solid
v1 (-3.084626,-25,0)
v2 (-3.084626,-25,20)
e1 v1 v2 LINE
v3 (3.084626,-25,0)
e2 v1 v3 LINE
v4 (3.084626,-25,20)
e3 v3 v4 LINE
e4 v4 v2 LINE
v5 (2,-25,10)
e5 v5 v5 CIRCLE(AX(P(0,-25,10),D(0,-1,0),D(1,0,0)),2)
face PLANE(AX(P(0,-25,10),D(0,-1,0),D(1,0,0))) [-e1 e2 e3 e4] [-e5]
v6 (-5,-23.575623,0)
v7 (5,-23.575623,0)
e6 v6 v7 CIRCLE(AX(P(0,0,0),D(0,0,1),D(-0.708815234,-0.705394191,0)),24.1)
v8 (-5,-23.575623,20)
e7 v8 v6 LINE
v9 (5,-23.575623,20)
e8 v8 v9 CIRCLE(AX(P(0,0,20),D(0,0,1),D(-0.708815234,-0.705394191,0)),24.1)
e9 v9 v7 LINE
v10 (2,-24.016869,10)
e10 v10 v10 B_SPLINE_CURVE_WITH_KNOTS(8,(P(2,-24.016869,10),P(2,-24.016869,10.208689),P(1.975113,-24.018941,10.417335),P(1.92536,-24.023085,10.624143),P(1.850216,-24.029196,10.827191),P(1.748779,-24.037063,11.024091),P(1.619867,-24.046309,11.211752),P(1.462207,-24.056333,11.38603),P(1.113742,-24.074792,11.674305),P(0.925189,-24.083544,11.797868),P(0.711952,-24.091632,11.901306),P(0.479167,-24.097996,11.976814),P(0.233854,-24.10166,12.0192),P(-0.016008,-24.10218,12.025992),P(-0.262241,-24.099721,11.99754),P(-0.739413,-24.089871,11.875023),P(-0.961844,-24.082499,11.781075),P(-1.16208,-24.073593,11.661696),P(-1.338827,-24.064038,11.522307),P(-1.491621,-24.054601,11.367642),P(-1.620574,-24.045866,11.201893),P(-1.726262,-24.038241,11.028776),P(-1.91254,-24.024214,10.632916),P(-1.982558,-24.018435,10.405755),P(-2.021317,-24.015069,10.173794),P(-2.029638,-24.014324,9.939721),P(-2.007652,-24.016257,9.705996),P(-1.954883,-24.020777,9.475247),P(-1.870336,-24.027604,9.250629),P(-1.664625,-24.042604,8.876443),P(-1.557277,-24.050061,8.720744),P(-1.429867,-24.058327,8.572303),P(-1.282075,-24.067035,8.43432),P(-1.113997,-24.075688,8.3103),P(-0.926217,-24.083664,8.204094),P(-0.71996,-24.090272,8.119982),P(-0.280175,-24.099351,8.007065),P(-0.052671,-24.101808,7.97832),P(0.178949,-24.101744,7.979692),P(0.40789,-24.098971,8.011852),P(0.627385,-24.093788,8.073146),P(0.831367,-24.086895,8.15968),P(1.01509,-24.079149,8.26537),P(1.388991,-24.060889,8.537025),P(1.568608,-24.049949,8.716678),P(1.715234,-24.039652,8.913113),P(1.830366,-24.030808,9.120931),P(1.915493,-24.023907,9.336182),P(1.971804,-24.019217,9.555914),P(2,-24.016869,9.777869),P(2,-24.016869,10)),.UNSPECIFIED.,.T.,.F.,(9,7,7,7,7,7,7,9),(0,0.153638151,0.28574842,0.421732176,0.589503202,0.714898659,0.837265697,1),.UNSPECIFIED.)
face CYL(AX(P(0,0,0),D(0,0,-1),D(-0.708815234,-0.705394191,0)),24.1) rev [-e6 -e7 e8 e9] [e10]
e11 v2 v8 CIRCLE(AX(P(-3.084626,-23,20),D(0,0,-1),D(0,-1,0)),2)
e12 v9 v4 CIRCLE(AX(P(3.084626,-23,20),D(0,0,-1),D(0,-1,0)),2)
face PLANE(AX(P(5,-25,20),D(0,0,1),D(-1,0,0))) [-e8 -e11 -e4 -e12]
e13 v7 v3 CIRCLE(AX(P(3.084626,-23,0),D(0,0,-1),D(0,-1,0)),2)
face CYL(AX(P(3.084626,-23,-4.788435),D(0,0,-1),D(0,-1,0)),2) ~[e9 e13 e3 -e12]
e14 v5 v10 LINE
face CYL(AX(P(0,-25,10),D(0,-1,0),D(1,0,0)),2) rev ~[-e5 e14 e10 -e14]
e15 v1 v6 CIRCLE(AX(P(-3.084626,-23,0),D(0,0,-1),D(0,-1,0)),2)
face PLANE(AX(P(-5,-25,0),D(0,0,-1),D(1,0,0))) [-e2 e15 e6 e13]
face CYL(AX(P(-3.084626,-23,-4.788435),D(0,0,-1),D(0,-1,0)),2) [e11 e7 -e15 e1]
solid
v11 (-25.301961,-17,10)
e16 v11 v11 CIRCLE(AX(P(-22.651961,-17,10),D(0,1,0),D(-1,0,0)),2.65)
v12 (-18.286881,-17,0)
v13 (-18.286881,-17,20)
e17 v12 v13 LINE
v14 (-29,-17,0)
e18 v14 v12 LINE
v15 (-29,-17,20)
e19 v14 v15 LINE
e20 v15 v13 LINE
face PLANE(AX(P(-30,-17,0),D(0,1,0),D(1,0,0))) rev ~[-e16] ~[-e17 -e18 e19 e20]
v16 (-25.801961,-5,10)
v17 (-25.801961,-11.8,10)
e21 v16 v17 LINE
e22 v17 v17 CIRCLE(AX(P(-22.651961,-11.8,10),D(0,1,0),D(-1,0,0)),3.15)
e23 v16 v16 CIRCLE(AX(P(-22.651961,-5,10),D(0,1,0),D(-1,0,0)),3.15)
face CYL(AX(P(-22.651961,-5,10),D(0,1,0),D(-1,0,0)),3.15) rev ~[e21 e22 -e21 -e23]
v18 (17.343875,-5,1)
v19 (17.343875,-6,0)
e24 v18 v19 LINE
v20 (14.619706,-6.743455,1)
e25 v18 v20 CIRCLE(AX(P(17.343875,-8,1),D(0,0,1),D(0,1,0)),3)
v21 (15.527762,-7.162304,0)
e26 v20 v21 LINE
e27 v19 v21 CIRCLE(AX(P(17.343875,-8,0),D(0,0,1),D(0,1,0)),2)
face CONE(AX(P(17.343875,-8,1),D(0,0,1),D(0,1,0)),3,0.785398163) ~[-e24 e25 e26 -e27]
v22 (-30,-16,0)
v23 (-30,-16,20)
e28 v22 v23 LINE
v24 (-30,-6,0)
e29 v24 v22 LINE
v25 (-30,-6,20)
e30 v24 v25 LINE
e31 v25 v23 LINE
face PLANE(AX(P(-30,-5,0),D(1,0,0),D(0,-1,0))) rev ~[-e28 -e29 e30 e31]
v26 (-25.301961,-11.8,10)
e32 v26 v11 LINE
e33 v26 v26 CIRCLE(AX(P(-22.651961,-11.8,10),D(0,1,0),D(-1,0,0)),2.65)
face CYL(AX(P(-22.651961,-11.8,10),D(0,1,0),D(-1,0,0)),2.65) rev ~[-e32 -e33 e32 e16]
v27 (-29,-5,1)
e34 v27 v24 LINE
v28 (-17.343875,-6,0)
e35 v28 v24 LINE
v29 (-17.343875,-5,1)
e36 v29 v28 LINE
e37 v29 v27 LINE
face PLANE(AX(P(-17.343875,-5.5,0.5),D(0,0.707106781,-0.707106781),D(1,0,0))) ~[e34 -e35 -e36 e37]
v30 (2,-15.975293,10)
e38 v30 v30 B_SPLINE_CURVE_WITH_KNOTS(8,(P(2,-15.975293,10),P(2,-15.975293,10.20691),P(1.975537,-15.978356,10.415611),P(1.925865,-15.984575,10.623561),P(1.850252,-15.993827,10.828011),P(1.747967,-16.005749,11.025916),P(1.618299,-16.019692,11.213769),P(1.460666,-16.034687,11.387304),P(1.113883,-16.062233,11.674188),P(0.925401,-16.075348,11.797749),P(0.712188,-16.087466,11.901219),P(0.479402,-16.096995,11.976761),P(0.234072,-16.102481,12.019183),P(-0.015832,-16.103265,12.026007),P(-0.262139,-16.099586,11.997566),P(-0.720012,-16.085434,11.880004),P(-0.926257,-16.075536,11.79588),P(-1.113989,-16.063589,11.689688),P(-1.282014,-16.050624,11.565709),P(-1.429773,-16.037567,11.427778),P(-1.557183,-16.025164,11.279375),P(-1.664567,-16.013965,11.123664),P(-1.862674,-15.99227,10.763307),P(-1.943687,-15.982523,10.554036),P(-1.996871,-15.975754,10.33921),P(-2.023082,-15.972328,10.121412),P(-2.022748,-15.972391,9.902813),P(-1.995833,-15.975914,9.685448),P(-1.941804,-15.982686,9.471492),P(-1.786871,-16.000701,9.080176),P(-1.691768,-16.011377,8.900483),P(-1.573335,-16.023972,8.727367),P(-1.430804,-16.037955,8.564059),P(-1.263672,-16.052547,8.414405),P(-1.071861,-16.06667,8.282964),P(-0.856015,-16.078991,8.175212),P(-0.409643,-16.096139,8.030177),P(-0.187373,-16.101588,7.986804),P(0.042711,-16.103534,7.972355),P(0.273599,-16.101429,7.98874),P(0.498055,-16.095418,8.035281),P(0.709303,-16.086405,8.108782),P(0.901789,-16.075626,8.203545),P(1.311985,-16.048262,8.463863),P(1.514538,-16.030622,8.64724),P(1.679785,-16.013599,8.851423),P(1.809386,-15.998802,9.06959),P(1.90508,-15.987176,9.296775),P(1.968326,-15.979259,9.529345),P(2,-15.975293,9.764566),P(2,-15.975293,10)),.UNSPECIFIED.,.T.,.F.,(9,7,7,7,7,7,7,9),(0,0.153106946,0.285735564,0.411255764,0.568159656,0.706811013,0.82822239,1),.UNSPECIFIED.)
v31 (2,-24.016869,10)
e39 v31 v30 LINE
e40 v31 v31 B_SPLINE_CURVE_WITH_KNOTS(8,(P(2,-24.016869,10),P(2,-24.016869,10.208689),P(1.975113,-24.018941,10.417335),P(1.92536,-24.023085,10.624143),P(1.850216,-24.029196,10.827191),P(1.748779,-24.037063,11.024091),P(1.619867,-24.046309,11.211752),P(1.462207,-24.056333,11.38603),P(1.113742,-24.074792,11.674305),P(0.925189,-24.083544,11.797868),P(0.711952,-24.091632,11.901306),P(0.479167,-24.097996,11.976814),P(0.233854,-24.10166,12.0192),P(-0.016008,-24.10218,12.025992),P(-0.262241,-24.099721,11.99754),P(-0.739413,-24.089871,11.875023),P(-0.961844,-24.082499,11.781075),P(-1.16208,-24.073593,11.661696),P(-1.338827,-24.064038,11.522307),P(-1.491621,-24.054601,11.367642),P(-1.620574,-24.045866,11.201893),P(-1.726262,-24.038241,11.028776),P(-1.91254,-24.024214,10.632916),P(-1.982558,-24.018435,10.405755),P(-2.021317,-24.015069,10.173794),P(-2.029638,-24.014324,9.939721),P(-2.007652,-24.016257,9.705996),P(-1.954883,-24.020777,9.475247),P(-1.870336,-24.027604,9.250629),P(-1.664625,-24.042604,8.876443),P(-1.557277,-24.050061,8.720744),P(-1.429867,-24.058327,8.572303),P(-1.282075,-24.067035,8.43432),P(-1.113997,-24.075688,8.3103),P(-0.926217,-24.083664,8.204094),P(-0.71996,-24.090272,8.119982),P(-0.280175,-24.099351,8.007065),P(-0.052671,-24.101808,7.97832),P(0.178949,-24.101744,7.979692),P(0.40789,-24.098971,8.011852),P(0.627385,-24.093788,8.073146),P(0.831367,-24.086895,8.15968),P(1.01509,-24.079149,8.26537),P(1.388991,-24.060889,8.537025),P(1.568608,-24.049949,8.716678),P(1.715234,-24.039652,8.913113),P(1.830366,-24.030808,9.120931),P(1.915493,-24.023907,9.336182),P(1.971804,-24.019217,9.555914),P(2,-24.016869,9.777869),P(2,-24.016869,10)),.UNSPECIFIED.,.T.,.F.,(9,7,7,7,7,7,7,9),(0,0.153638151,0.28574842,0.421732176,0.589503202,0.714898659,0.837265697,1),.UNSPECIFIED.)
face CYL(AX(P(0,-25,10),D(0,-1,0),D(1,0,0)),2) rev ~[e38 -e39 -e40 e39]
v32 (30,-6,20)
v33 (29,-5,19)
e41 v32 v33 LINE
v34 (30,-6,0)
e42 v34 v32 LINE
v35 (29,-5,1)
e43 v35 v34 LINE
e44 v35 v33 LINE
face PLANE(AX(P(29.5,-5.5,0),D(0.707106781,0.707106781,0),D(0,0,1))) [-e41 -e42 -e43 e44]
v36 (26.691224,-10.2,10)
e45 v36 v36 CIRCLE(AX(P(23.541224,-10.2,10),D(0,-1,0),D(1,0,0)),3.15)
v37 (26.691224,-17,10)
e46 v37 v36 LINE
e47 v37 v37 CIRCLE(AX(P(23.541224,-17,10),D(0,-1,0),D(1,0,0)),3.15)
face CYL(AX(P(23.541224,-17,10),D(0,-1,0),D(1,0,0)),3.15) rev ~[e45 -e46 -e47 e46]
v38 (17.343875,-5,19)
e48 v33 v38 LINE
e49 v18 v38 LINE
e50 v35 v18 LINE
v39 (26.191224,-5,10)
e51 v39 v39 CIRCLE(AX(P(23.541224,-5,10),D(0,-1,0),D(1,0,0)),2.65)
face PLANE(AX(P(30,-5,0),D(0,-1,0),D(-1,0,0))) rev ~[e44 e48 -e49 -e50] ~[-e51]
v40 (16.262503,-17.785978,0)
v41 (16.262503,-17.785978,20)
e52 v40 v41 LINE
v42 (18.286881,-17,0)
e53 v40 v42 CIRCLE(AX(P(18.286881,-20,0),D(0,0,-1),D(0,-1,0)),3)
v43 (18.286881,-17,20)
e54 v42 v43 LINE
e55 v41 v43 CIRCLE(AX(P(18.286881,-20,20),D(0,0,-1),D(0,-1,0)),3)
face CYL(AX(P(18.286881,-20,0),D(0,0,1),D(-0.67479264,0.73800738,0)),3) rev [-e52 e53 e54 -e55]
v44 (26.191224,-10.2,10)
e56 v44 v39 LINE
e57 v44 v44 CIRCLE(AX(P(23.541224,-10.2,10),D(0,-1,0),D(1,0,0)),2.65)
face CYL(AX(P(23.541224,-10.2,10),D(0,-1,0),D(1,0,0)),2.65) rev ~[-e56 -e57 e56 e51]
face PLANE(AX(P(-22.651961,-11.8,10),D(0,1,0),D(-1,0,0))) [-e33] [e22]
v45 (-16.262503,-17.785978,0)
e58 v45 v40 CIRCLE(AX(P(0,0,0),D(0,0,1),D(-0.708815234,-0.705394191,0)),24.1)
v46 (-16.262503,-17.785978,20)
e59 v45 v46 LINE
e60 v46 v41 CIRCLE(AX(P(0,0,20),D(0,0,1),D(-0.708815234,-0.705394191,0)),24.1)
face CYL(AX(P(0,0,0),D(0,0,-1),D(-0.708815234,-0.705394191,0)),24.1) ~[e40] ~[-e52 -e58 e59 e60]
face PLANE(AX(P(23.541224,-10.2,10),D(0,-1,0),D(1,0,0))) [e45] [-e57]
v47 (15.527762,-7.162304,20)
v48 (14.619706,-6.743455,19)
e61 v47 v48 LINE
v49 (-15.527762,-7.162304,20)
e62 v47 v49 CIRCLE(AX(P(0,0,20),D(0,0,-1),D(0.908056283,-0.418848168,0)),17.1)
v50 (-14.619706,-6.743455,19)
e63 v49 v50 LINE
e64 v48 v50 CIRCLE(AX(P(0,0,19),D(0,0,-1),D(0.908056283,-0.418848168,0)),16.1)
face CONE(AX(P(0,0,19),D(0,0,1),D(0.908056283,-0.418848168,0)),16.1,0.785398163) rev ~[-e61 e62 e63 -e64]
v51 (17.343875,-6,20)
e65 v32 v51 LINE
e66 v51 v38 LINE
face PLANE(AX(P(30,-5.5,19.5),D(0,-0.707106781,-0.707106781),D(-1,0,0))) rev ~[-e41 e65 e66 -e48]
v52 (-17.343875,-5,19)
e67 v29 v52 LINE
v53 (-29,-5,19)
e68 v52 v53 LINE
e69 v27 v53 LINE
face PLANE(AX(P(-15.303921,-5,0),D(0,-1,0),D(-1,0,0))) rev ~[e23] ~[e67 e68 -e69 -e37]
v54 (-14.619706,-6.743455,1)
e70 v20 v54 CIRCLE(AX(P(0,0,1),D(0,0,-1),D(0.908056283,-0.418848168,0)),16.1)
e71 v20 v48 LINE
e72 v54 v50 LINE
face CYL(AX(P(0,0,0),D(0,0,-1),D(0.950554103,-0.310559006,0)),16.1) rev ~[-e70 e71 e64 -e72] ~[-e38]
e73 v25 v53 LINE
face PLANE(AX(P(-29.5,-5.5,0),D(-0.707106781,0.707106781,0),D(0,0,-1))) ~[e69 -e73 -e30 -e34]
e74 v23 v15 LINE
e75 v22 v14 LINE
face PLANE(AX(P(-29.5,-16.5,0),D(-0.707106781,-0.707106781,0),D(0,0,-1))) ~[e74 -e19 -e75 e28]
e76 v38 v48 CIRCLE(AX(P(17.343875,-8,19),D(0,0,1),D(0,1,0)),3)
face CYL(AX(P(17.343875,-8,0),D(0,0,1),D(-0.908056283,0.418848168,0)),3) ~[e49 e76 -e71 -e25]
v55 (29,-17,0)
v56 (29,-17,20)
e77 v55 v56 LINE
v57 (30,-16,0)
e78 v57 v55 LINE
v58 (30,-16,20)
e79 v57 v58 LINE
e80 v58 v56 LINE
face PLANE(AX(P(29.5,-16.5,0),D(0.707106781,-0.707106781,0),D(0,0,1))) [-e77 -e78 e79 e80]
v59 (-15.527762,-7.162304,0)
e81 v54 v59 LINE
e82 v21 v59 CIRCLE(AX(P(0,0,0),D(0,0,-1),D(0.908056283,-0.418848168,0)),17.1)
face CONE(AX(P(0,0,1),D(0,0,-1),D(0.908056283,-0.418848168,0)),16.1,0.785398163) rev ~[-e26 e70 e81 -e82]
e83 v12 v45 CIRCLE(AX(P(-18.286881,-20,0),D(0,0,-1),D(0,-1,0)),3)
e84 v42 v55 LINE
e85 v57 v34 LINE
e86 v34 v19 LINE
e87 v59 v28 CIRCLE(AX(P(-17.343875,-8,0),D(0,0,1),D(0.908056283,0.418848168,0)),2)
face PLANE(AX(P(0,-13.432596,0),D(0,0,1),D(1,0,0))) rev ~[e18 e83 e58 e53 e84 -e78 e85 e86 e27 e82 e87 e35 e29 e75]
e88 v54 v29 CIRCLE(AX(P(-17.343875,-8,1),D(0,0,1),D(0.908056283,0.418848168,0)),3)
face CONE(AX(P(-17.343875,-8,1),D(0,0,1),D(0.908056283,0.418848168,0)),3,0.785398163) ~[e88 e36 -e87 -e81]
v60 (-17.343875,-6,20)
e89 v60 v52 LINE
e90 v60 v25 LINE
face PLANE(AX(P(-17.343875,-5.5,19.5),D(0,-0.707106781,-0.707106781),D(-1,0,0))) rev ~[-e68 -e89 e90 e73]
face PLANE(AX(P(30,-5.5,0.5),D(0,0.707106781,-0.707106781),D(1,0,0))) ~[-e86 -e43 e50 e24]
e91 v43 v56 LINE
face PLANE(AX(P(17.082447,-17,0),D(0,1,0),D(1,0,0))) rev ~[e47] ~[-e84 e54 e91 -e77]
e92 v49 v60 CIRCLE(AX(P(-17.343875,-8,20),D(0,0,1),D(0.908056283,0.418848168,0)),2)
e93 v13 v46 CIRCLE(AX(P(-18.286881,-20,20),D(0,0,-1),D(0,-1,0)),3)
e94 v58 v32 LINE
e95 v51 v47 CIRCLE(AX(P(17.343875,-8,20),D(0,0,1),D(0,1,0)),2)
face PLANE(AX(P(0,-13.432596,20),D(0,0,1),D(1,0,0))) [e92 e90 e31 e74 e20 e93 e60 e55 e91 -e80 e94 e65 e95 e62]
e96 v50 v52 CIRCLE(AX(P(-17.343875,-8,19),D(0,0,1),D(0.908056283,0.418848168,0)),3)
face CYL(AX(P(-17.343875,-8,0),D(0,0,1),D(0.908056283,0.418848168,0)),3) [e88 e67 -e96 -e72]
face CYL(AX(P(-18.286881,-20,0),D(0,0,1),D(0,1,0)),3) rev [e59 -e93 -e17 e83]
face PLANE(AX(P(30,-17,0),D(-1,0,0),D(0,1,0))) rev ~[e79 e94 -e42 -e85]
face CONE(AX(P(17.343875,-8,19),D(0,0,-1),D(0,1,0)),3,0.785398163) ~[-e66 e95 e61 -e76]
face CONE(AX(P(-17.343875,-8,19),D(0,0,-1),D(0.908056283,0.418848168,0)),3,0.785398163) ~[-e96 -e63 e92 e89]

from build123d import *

# Parameters (mm, degrees)
F1_DEPTH     = 20
F2_R         = 3.15
F3_DEPTH     = 6.8
F4_R         = 2.65
F5_DEPTH     = 5.2
F6_R         = 3.15
F7_DEPTH     = 6.8
F8_R         = 2.65
F9_DEPTH     = 5.2
F13_R        = 2
F14_DEPTH    = 30
F15_R        = 3
F16_T1_DEPTH = 29.5768707806
F17_SIZE     = 1


# Not quite as in the source:
# - a fillet or chamfer that OpenCascade refuses, or shapes differently, is made with other operations: its cross-section is extruded or revolved along the edge and cut away or added


with BuildPart() as f1:
    # F0 (on Top) → F1 (new body)
    with BuildSketch(Plane.XY):
        with BuildLine():
            ThreePointArc((15.3039210662, -5), (0, -16.1), (-15.3039210662, -5))
            Line((-15.3039210662, -5), (-30, -5))
            Line((-30, -5), (-30, -17))
            Line((-30, -17), (-17.0824471315, -17))
            ThreePointArc((-17.0824471315, -17), (0, -24.1), (17.0824471315, -17))
            Line((17.0824471315, -17), (30, -17))
            Line((30, -17), (30, -5))
            Line((30, -5), (15.3039210662, -5))
        make_face()
    extrude(amount=F1_DEPTH)

    # F2 (on face) → F3 (cut)
    with BuildSketch(Plane.XZ.offset(17)):
        with Locations((23.5412235657, 10)):
            Circle(F2_R)
    extrude(amount=-F3_DEPTH, mode=Mode.SUBTRACT)

    # F4 (on face) → F5 (cut, through all)
    with BuildSketch(Plane.XZ.offset(10.2)):
        with Locations((23.5412235657, 10)):
            Circle(F4_R)
    extrude(amount=-F5_DEPTH, mode=Mode.SUBTRACT)

    # F6 (on face) → F7 (cut)
    with BuildSketch(Plane(origin=(0, -5, 0), x_dir=(-1, 0, 0), z_dir=(0, 1, 0))):
        with Locations((22.6519605331, 10)):
            Circle(F6_R)
    extrude(amount=-F7_DEPTH, mode=Mode.SUBTRACT)

    # F8 (on face) → F9 (cut, through all)
    with BuildSketch(Plane(origin=(0, -11.8, 0), x_dir=(-1, 0, 0), z_dir=(0, 1, 0))):
        with Locations((22.6519605331, 10)):
            Circle(F8_R)
    extrude(amount=-F9_DEPTH, mode=Mode.SUBTRACT)


with BuildPart() as f12:
    # F11 (on offset) → F12 (new body, up to the next surface of F1)
    with BuildSketch(Plane.XZ.offset(25)):
        Polygon((-5, 0), (0, 0), (5, 0), (5, 20), (-5, 20), align=None)
    extrude(until=Until.NEXT, target=f1.part, dir=(0, 1, 0))


with BuildPart() as f14_tool:
    # F13 (on face) → F14 (new body)
    with BuildSketch(Plane.XZ.offset(25)):
        with Locations((0, 10)):
            Circle(F13_R)
    extrude(amount=-F14_DEPTH)


with BuildPart() as f1_1:
    add(f1.part)

    # F14: cut by f14_tool
    add(f14_tool.part, mode=Mode.SUBTRACT)

    # F15
    f15_edges = [f1_1.edges().sort_by_distance(p)[0] for p in [
        (-15.303921, -5, 10),
        (15.303921, -5, 10),
        (-17.082447, -17, 10),
        (17.082447, -17, 10),
    ]]
    fillet(f15_edges, radius=F15_R)

    # F17
    f17_edges = [f1_1.edges().sort_by_distance(p)[0] for p in [
        (0, -16.1, 0),
        (-23.671937, -5, 20),
        (30, -17, 10),
        (-30, -17, 10),
        (-30, -5, 10),
        (30, -5, 10),
        (0, -16.1, 20),
        (15.726722, -5.473181, 0),
        (-15.726722, -5.473181, 0),
        (23.671937, -5, 0),
        (-23.671937, -5, 0),
        (15.726722, -5.473181, 20),
        (-15.726722, -5.473181, 20),
        (23.671937, -5, 20),
    ]]
    chamfer(f17_edges, length=F17_SIZE)


with BuildPart() as f12_1:
    add(f12.part)

    # F14: cut by f14_tool
    add(f14_tool.part, mode=Mode.SUBTRACT)

    # F16: fillet of radius 2 on 2 edges, made by hand

    # F16_s2 → F16_t1 (cut)
    with BuildSketch(Plane.XY.offset(-4.7884353903)):
        with BuildLine():
            ThreePointArc((-3.0846258439, -25), (-4.2780985066, -24.6048747625), (-5, -23.5756230034))
            Line((-5, -23.5756230034), (-5, -25))
            Line((-5, -25), (-3.0846258439, -25))
        make_face()
        with BuildLine():
            ThreePointArc((3.0846258439, -25), (4.2780985066, -24.6048747625), (5, -23.5756230034))
            Line((5, -23.5756230034), (5, -25))
            Line((5, -25), (3.0846258439, -25))
        make_face()
    extrude(amount=F16_T1_DEPTH, mode=Mode.SUBTRACT)


solid = Compound([f1_1.part, f12_1.part])
